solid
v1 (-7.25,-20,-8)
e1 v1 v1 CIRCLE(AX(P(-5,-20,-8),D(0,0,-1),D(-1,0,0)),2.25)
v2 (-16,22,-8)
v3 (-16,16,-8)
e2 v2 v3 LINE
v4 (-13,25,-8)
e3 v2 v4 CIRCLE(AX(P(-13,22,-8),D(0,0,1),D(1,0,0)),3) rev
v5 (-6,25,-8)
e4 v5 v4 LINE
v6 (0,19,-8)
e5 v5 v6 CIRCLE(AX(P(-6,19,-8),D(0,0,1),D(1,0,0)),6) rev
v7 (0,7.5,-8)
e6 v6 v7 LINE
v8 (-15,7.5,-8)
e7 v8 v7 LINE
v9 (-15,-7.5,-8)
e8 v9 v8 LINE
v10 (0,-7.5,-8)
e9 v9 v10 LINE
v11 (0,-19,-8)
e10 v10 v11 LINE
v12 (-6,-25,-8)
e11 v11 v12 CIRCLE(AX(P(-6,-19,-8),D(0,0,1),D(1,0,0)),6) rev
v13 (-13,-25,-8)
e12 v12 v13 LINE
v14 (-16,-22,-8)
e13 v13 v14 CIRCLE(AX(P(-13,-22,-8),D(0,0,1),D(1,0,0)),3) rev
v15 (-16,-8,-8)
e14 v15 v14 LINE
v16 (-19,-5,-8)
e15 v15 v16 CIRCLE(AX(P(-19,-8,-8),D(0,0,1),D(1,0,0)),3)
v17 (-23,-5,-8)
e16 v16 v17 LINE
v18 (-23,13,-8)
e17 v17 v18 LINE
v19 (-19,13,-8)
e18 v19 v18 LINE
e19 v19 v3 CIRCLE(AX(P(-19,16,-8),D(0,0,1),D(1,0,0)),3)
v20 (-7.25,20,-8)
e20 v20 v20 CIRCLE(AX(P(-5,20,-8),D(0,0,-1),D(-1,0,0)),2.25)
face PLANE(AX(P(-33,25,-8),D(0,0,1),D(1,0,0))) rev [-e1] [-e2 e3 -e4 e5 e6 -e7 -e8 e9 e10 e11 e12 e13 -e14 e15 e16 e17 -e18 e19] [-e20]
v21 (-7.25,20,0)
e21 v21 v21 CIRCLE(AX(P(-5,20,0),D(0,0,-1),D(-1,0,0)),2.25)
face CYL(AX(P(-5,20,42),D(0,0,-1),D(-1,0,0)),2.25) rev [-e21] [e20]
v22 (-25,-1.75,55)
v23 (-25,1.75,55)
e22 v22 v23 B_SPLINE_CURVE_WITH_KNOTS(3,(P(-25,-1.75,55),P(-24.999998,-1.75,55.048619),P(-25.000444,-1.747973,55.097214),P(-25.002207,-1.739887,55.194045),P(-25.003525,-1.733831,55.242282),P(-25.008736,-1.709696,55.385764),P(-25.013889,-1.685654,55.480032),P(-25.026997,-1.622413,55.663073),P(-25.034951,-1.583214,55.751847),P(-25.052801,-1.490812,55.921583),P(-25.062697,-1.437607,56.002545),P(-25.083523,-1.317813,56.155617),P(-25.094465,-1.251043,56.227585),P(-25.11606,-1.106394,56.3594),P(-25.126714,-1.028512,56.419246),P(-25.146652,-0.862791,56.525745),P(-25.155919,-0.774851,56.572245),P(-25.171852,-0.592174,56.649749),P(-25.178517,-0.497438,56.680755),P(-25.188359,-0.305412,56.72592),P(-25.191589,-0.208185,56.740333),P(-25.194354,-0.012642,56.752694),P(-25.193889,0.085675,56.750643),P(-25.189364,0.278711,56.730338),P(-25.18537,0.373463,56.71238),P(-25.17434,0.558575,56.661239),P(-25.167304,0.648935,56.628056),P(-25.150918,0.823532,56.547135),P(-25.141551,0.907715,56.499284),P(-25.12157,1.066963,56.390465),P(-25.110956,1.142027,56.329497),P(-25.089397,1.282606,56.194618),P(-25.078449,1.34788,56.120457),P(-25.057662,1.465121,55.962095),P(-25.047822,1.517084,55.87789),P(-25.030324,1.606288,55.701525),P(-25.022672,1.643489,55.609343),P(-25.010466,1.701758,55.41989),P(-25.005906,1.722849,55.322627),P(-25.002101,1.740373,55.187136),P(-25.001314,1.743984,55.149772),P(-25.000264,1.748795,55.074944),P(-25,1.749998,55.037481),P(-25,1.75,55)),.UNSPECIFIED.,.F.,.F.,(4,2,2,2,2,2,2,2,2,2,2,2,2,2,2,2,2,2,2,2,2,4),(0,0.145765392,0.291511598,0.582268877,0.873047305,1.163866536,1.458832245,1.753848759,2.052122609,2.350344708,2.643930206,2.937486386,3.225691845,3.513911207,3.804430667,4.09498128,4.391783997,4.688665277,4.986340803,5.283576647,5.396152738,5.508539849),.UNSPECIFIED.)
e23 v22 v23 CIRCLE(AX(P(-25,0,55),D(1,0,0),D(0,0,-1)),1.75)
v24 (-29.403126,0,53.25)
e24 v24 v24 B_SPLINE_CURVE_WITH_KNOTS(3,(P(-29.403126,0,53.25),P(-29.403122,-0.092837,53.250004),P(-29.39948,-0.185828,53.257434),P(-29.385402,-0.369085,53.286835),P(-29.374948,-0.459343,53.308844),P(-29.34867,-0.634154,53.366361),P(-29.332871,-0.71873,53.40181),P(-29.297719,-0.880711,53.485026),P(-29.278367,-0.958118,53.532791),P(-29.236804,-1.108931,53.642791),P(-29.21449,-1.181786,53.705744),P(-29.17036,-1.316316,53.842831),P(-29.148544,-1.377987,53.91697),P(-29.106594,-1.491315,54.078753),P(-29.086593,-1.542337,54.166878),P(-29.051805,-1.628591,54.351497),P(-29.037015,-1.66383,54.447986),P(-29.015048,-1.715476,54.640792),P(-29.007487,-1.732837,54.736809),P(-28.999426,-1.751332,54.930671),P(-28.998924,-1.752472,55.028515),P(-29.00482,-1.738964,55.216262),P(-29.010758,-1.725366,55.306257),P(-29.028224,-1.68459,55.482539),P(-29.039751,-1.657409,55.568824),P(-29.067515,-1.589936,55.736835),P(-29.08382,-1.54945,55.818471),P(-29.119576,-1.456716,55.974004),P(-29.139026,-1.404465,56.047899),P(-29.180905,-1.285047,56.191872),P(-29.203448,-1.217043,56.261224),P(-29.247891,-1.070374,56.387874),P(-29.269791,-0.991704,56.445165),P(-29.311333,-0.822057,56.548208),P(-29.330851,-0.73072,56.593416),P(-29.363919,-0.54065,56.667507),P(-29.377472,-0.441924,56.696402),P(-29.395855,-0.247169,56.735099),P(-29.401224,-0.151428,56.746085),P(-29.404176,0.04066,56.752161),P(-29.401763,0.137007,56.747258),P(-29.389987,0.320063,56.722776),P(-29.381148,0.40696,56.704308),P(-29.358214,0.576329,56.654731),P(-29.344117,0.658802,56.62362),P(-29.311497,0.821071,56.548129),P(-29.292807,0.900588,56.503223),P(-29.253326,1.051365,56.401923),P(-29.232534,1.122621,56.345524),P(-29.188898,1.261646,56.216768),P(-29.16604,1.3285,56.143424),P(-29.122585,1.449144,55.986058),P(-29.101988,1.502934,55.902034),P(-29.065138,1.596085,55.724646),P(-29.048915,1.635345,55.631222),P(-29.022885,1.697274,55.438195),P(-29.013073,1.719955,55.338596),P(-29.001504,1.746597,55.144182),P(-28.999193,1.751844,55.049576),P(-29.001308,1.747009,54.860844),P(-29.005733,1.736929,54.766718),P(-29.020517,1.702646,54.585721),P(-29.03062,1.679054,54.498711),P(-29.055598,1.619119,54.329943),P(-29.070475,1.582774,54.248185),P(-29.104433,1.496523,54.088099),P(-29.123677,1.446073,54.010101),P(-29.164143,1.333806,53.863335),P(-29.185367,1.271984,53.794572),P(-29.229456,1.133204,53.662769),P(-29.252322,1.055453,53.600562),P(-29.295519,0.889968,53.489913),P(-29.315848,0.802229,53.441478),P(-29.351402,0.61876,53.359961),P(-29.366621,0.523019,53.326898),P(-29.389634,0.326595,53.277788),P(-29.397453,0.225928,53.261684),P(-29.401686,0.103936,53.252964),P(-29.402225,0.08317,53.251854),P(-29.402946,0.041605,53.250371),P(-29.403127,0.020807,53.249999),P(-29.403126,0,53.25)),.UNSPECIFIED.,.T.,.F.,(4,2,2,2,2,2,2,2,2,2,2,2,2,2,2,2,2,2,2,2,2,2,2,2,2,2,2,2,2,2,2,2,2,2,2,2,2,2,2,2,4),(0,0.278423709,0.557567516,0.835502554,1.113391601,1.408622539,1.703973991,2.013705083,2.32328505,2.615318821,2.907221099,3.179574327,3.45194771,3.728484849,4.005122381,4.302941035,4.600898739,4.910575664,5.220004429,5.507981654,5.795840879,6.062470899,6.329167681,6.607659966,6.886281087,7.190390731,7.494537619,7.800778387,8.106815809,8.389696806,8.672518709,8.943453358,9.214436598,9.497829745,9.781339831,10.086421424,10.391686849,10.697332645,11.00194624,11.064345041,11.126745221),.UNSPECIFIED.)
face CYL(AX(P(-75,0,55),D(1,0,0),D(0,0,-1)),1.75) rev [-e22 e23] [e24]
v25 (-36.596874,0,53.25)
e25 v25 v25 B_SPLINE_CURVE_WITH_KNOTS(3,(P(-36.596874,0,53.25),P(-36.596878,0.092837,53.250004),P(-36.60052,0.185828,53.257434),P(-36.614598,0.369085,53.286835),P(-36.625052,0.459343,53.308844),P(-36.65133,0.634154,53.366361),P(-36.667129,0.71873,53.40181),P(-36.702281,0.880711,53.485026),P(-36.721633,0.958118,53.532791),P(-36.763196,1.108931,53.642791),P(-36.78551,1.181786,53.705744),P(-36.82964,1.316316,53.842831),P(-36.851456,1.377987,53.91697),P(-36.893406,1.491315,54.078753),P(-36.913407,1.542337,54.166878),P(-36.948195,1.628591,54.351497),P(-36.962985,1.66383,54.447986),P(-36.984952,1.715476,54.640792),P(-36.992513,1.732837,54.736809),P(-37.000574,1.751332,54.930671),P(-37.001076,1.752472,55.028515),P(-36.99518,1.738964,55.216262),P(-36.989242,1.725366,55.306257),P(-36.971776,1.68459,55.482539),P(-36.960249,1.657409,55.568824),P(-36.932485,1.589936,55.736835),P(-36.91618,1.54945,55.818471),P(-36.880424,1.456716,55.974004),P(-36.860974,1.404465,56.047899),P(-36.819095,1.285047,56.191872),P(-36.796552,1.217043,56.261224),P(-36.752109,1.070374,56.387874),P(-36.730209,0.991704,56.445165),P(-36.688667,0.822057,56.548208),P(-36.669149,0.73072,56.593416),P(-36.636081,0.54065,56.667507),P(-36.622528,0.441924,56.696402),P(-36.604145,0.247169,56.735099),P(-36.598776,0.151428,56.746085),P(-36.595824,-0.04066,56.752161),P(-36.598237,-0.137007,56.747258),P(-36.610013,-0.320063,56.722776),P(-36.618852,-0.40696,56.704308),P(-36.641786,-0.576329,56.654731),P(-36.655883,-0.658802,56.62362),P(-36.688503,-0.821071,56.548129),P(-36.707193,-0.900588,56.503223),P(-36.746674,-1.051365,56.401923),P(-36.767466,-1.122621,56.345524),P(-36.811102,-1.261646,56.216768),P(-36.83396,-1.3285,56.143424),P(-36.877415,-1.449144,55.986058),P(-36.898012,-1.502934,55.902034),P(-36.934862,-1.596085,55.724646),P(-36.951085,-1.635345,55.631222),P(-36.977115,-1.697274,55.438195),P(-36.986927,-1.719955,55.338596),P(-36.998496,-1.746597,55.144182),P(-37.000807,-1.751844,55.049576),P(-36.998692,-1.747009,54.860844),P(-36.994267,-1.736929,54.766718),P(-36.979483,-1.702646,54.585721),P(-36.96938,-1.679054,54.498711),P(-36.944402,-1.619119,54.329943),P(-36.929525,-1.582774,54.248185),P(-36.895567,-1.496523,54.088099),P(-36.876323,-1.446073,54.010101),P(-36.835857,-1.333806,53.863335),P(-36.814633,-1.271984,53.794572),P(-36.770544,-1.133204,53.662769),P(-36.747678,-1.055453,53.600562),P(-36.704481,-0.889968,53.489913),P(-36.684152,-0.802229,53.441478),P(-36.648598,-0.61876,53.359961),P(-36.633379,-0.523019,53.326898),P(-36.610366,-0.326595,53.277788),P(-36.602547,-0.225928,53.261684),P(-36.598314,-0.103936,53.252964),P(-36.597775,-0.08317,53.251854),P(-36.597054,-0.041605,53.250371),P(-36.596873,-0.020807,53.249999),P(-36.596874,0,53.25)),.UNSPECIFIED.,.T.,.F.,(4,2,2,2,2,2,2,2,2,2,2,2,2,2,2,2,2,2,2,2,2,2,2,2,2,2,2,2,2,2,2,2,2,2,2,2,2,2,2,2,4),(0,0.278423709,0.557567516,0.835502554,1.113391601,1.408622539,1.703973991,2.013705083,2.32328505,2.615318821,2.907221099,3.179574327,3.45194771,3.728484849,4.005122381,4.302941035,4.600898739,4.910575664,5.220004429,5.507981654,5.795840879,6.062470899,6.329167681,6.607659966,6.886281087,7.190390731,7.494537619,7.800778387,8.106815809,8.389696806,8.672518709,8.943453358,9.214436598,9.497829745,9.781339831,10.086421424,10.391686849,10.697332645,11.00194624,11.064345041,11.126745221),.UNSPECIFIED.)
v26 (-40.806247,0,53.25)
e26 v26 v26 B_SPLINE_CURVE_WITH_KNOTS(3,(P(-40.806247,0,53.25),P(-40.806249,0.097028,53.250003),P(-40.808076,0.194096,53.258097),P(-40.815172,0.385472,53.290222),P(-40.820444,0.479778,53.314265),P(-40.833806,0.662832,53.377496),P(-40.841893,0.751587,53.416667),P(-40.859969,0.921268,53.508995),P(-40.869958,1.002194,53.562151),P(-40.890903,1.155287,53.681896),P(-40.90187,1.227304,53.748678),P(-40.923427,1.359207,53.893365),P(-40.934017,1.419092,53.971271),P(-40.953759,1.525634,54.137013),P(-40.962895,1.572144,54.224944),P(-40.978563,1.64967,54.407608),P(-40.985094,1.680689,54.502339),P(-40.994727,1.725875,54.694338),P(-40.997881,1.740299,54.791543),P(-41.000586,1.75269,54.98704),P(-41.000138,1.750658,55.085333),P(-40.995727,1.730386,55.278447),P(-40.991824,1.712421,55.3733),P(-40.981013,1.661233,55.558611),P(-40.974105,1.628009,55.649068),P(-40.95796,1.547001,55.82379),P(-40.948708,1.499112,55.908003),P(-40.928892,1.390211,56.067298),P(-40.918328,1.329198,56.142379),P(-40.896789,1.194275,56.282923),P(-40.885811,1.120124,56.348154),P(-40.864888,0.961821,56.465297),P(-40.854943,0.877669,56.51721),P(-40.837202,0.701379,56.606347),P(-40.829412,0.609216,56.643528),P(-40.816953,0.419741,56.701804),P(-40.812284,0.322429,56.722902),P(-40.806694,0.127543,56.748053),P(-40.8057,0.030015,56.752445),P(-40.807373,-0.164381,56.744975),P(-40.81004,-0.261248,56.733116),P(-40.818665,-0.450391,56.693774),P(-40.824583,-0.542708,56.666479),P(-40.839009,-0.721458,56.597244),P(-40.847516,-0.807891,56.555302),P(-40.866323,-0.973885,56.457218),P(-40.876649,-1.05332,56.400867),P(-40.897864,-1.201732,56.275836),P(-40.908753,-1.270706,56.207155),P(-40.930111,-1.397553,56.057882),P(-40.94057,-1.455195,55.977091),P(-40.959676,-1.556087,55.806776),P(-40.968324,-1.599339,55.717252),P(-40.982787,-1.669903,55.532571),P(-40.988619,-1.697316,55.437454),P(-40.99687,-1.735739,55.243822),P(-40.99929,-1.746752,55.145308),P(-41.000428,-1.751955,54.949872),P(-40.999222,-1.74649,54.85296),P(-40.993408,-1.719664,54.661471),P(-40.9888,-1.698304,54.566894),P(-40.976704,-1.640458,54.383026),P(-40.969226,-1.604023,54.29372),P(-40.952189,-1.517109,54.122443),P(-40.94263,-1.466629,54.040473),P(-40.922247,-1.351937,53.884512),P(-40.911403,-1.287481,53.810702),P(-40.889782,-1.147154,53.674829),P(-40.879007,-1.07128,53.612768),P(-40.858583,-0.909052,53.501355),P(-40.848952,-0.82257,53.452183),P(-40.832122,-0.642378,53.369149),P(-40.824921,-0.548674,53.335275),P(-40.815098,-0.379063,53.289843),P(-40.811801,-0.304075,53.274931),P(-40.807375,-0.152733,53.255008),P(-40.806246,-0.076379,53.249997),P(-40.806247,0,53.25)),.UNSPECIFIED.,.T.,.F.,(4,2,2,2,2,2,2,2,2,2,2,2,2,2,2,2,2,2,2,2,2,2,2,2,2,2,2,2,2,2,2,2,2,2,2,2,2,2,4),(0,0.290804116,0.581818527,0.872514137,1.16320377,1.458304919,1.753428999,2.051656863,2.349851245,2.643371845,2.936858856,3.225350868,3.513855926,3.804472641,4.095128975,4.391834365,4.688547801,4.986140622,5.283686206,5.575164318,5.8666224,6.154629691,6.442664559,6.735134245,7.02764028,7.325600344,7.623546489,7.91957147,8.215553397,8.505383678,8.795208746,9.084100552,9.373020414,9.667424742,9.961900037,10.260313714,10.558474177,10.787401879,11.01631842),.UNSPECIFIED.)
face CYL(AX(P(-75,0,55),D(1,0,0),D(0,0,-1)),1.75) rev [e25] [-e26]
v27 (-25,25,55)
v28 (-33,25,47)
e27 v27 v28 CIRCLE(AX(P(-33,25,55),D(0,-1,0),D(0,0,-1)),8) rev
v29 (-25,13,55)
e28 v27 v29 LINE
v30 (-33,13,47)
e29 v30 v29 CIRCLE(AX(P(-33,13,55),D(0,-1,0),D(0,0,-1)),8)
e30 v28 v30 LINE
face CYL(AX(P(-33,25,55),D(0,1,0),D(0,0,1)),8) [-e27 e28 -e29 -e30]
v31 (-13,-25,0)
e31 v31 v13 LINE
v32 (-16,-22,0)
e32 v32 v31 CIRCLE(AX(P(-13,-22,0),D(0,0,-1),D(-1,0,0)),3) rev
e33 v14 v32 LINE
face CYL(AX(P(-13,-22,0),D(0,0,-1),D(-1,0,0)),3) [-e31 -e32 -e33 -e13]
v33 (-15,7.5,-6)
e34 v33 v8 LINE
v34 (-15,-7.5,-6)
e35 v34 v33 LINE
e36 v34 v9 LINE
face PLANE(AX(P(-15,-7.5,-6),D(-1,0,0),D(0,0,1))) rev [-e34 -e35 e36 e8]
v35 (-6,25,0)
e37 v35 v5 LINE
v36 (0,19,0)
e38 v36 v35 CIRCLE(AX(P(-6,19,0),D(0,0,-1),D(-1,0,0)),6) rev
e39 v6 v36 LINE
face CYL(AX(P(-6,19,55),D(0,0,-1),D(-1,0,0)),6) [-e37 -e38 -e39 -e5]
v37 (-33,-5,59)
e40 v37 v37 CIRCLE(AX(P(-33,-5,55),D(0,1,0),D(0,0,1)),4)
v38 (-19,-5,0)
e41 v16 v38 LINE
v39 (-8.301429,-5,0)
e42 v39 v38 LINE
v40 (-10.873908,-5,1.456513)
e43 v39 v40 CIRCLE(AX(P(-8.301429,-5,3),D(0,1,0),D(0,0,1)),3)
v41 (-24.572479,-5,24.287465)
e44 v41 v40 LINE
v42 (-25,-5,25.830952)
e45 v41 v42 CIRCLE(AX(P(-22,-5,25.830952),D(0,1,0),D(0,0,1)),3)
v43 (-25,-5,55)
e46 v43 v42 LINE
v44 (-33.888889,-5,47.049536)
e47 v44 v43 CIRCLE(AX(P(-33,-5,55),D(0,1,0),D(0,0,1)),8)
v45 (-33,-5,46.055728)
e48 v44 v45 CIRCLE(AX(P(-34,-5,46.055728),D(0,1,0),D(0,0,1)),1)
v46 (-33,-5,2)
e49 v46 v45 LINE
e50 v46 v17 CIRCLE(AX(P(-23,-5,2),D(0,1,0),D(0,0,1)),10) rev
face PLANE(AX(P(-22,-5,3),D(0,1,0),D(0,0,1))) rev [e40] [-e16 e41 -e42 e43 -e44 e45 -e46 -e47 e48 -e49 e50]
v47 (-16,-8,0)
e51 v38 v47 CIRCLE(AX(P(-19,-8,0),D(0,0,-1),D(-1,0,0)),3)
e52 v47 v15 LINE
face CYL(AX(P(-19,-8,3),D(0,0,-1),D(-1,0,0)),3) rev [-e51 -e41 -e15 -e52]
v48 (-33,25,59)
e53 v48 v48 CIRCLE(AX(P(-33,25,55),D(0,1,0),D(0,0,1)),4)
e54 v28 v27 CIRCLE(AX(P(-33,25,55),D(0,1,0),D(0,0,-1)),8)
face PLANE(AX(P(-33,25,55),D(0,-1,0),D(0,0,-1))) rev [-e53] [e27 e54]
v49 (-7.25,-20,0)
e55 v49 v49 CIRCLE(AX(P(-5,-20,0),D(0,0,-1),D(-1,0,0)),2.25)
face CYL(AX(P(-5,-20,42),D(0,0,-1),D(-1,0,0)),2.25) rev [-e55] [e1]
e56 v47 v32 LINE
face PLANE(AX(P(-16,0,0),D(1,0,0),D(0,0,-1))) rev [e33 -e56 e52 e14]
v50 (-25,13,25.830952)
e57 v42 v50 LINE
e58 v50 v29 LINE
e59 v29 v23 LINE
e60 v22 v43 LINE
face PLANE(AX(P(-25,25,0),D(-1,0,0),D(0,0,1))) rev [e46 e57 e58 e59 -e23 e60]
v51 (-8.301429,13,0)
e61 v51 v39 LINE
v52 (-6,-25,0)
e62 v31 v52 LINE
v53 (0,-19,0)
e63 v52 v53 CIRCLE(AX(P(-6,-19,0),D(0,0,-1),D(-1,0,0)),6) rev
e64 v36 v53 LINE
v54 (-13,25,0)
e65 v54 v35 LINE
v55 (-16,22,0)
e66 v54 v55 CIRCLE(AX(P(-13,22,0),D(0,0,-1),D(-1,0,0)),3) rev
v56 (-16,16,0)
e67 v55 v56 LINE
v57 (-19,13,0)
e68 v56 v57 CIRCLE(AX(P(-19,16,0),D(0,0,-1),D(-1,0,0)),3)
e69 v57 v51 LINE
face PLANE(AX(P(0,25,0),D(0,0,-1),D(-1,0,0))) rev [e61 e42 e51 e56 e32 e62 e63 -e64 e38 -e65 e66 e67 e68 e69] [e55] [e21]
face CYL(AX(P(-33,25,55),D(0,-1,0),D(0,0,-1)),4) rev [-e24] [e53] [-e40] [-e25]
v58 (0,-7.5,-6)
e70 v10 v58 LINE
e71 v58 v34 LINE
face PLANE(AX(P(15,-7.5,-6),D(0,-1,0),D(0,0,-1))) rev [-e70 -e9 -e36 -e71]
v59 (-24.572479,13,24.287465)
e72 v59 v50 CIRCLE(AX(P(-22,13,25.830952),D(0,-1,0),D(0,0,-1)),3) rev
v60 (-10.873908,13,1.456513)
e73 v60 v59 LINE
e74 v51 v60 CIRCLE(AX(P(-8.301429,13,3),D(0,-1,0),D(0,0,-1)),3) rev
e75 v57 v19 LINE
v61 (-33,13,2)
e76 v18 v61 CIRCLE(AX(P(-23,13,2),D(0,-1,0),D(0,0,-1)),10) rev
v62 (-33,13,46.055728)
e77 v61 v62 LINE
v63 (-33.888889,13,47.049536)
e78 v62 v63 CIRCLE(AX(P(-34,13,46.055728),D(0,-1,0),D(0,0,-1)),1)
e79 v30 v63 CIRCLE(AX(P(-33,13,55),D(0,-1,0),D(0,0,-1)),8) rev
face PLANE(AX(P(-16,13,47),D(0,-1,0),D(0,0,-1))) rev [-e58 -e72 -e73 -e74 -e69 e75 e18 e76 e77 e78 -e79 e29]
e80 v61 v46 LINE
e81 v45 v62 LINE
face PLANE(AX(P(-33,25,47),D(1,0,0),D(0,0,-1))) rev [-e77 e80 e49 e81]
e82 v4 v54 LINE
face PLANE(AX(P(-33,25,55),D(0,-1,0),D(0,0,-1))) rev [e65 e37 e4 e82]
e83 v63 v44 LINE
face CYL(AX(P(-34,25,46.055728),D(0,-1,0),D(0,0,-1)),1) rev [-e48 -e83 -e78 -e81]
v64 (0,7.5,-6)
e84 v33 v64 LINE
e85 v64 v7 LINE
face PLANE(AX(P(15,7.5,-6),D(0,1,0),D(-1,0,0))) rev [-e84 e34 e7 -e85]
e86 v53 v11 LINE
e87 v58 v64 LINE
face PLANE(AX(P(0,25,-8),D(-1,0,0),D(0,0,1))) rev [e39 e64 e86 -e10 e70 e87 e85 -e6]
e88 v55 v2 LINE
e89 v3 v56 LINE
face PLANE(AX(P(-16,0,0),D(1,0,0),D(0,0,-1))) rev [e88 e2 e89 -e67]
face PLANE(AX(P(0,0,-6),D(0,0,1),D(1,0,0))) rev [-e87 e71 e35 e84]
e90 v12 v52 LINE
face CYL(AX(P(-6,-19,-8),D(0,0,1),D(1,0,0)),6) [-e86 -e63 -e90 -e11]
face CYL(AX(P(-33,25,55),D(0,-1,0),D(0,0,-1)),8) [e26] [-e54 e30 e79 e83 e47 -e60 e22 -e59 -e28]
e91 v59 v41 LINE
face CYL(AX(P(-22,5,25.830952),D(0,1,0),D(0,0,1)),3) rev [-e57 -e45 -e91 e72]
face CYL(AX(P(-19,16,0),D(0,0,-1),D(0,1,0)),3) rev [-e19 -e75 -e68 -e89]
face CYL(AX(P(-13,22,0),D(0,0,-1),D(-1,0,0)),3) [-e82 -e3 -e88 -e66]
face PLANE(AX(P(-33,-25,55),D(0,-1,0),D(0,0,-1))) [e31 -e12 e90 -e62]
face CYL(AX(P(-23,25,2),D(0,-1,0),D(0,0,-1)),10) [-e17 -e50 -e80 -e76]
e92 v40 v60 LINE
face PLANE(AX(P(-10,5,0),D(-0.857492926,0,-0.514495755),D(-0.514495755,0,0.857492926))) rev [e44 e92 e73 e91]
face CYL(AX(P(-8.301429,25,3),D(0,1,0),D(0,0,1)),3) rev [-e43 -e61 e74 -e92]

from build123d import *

# Parameters (mm, degrees)
SKETCH_6_R               = 4
EXTRUDE_3_DEPTH          = 25
FILLET_1_R               = 10
FILLET_2_R               = 3
SKETCH_7_R               = 2.25
CUT_EXTRUDE_4_DEPTH      = 50
SKETCH_8_R               = 1.75
CUT_EXTRUDE_5_DEPTH      = 50
EXTRUDE_4_DEPTH          = 5
FILLET_5_R               = 3
FILLET_6_R               = 6
SKETCH_11_W              = 55
SKETCH_11_H              = 12
CUT_EXTRUDE_7_DEPTH      = 17
CUT_EXTRUDE_8_DEPTH      = 80.214897752
CUT_EXTRUDE_8_DEPTH_BACK = 80.214897752
SKETCH_12_W              = 30.277816987
SKETCH_12_H              = 21.642627305
FILLET_7_R               = 8
FILLET_8_R               = 3
FILLET_9_R               = 1
FILLET_10_R              = 3
EXTRUDE_5_DEPTH          = 8
SKETCH_14_W              = 30
SKETCH_14_H              = 15
CUT_EXTRUDE_9_DEPTH      = 2


with BuildPart() as part:
    # 草图6 → 凸台-拉伸3 (new, symmetric)
    with BuildSketch(Plane(origin=(0, 0, 0), x_dir=(1, 0, 0), z_dir=(0, 1, 0))):
        with BuildLine():
            Line((0, 0), (-25, 0))
            Line((-25, 0), (-25, -55))
            ThreePointArc((-25, -55), (-33, -63), (-41, -55))
            ThreePointArc((-41, -55), (-38.656854249, -49.343145751), (-33, -47))
            Line((-33, -47), (-33, 8))
            Line((-33, 8), (0, 8))
            Line((0, 8), (0, 0))
        make_face()
        with Locations(Location((-33, -55, 0), (0, 0, 270))):
            Circle(SKETCH_6_R, mode=Mode.SUBTRACT)
    extrude(amount=EXTRUDE_3_DEPTH, both=True)

    # 圆角1
    fillet_1_edges = [part.edges().sort_by_distance(p)[0] for p in [
        (-33, 0, -8),
    ]]
    fillet(fillet_1_edges, radius=FILLET_1_R)

    # 圆角2
    fillet_2_edges = [part.edges().sort_by_distance(p)[0] for p in [
        (-25, 0, 0),
    ]]
    fillet(fillet_2_edges, radius=FILLET_2_R)

    # 草图7 → 切除-拉伸4 (cut)
    with BuildSketch(Plane(origin=(0, 0, -8), x_dir=(-1, 0, 0), z_dir=(0, 0, -1))):
        with Locations((5, 20)):
            Circle(SKETCH_7_R)
        with Locations((5, -20)):
            Circle(SKETCH_7_R)
    extrude(amount=-CUT_EXTRUDE_4_DEPTH, mode=Mode.SUBTRACT)

    # 草图8 → 切除-拉伸5 (cut)
    with BuildSketch(Plane(origin=(-25, 0, 0), x_dir=(0, 0, -1), z_dir=(1, 0, 0))):
        with Locations((-55, 0)):
            Circle(SKETCH_8_R)
    extrude(amount=-CUT_EXTRUDE_5_DEPTH, mode=Mode.SUBTRACT)

    # 草图9 → 凸台-拉伸4 (add, symmetric)
    with BuildSketch(Plane(origin=(0, 0, 0), x_dir=(1, 0, 0), z_dir=(0, 1, 0))):
        with BuildLine():
            Line((-10, 0), (-25, -25))
            Line((-25, -25), (-25, -3))
            ThreePointArc((-25, -3), (-24.121320344, -0.878679656), (-22, 0))
            Line((-22, 0), (-10, 0))
        make_face()
    extrude(amount=EXTRUDE_4_DEPTH, both=True)

    # 圆角5
    fillet_5_edges = [part.edges().sort_by_distance(p)[0] for p in [
        (-10, 0, 0),
        (-25, 0, 25),
    ]]
    fillet(fillet_5_edges, radius=FILLET_5_R)

    # 圆角6
    fillet_6_edges = [part.edges().sort_by_distance(p)[0] for p in [
        (0, 25, -4),
        (0, -25, -4),
    ]]
    fillet(fillet_6_edges, radius=FILLET_6_R)

    # 草图11 → 切除-拉伸7 (cut)
    with BuildSketch(Plane.ZY.offset(33)):
        with Locations((19.5, 19)):
            Rectangle(SKETCH_11_W, SKETCH_11_H)
        with Locations((19.5, -19)):
            Rectangle(SKETCH_11_W, SKETCH_11_H)
    extrude(amount=-CUT_EXTRUDE_7_DEPTH, mode=Mode.SUBTRACT)

    # 草图12 → 切除-拉伸8 (cut, two sides: drawn at the far end of the back side and taken through both)
    with BuildSketch(Plane.XY.offset(-CUT_EXTRUDE_8_DEPTH_BACK)):
        with Locations((-31.138908494, -15.821313653)):
            Rectangle(SKETCH_12_W, SKETCH_12_H)
    extrude(amount=CUT_EXTRUDE_8_DEPTH + CUT_EXTRUDE_8_DEPTH_BACK, mode=Mode.SUBTRACT)

    # 圆角7
    fillet_7_edges = [part.edges().sort_by_distance(p)[0] for p in [
        (-25, 19, 47),
    ]]
    fillet(fillet_7_edges, radius=FILLET_7_R - 0.0001)  # a hair under: the kernel refuses the full size

    # 圆角8
    fillet_8_edges = [part.edges().sort_by_distance(p)[0] for p in [
        (-16, 13, -4),
        (-16, 25, -4),
    ]]
    fillet(fillet_8_edges, radius=FILLET_8_R)

    # 圆角9
    fillet_9_edges = [part.edges().sort_by_distance(p)[0] for p in [
        (-33, 6.5, 47),
    ]]
    fillet(fillet_9_edges, radius=FILLET_9_R)

    # 圆角10
    fillet_10_edges = [part.edges().sort_by_distance(p)[0] for p in [
        (-16, -25, -4),
        (-16, -5, -4),
    ]]
    fillet(fillet_10_edges, radius=FILLET_10_R)

    # 草图13 → 凸台-拉伸5 (add)
    with BuildSketch(Plane(origin=(0, 5, 0), x_dir=(1, 0, 0), z_dir=(0, 1, 0))):
        with BuildLine():
            Line((-8.301428863, 0), (-22, 0))
            ThreePointArc((-22, 0), (-24.121320344, -0.878679656), (-25, -3))
            Line((-25, -3), (-25, -25.830951895))
            ThreePointArc((-25, -25.830951895), (-24.891144785, -25.030151149), (-24.572478777, -24.287464629))
            Line((-24.572478777, -24.287464629), (-10.87390764, -1.456512734))
            ThreePointArc((-10.87390764, -1.456512734), (-9.779525308, -0.38940028), (-8.301428863, 0))
        make_face()
    extrude(amount=EXTRUDE_5_DEPTH)

    # 草图14 → 切除-拉伸9 (cut)
    with BuildSketch(Plane(origin=(0, 0, -8), x_dir=(-1, 0, 0), z_dir=(0, 0, -1))):
        Rectangle(SKETCH_14_W, SKETCH_14_H)
    extrude(amount=-CUT_EXTRUDE_9_DEPTH, mode=Mode.SUBTRACT)


solid = part.part
